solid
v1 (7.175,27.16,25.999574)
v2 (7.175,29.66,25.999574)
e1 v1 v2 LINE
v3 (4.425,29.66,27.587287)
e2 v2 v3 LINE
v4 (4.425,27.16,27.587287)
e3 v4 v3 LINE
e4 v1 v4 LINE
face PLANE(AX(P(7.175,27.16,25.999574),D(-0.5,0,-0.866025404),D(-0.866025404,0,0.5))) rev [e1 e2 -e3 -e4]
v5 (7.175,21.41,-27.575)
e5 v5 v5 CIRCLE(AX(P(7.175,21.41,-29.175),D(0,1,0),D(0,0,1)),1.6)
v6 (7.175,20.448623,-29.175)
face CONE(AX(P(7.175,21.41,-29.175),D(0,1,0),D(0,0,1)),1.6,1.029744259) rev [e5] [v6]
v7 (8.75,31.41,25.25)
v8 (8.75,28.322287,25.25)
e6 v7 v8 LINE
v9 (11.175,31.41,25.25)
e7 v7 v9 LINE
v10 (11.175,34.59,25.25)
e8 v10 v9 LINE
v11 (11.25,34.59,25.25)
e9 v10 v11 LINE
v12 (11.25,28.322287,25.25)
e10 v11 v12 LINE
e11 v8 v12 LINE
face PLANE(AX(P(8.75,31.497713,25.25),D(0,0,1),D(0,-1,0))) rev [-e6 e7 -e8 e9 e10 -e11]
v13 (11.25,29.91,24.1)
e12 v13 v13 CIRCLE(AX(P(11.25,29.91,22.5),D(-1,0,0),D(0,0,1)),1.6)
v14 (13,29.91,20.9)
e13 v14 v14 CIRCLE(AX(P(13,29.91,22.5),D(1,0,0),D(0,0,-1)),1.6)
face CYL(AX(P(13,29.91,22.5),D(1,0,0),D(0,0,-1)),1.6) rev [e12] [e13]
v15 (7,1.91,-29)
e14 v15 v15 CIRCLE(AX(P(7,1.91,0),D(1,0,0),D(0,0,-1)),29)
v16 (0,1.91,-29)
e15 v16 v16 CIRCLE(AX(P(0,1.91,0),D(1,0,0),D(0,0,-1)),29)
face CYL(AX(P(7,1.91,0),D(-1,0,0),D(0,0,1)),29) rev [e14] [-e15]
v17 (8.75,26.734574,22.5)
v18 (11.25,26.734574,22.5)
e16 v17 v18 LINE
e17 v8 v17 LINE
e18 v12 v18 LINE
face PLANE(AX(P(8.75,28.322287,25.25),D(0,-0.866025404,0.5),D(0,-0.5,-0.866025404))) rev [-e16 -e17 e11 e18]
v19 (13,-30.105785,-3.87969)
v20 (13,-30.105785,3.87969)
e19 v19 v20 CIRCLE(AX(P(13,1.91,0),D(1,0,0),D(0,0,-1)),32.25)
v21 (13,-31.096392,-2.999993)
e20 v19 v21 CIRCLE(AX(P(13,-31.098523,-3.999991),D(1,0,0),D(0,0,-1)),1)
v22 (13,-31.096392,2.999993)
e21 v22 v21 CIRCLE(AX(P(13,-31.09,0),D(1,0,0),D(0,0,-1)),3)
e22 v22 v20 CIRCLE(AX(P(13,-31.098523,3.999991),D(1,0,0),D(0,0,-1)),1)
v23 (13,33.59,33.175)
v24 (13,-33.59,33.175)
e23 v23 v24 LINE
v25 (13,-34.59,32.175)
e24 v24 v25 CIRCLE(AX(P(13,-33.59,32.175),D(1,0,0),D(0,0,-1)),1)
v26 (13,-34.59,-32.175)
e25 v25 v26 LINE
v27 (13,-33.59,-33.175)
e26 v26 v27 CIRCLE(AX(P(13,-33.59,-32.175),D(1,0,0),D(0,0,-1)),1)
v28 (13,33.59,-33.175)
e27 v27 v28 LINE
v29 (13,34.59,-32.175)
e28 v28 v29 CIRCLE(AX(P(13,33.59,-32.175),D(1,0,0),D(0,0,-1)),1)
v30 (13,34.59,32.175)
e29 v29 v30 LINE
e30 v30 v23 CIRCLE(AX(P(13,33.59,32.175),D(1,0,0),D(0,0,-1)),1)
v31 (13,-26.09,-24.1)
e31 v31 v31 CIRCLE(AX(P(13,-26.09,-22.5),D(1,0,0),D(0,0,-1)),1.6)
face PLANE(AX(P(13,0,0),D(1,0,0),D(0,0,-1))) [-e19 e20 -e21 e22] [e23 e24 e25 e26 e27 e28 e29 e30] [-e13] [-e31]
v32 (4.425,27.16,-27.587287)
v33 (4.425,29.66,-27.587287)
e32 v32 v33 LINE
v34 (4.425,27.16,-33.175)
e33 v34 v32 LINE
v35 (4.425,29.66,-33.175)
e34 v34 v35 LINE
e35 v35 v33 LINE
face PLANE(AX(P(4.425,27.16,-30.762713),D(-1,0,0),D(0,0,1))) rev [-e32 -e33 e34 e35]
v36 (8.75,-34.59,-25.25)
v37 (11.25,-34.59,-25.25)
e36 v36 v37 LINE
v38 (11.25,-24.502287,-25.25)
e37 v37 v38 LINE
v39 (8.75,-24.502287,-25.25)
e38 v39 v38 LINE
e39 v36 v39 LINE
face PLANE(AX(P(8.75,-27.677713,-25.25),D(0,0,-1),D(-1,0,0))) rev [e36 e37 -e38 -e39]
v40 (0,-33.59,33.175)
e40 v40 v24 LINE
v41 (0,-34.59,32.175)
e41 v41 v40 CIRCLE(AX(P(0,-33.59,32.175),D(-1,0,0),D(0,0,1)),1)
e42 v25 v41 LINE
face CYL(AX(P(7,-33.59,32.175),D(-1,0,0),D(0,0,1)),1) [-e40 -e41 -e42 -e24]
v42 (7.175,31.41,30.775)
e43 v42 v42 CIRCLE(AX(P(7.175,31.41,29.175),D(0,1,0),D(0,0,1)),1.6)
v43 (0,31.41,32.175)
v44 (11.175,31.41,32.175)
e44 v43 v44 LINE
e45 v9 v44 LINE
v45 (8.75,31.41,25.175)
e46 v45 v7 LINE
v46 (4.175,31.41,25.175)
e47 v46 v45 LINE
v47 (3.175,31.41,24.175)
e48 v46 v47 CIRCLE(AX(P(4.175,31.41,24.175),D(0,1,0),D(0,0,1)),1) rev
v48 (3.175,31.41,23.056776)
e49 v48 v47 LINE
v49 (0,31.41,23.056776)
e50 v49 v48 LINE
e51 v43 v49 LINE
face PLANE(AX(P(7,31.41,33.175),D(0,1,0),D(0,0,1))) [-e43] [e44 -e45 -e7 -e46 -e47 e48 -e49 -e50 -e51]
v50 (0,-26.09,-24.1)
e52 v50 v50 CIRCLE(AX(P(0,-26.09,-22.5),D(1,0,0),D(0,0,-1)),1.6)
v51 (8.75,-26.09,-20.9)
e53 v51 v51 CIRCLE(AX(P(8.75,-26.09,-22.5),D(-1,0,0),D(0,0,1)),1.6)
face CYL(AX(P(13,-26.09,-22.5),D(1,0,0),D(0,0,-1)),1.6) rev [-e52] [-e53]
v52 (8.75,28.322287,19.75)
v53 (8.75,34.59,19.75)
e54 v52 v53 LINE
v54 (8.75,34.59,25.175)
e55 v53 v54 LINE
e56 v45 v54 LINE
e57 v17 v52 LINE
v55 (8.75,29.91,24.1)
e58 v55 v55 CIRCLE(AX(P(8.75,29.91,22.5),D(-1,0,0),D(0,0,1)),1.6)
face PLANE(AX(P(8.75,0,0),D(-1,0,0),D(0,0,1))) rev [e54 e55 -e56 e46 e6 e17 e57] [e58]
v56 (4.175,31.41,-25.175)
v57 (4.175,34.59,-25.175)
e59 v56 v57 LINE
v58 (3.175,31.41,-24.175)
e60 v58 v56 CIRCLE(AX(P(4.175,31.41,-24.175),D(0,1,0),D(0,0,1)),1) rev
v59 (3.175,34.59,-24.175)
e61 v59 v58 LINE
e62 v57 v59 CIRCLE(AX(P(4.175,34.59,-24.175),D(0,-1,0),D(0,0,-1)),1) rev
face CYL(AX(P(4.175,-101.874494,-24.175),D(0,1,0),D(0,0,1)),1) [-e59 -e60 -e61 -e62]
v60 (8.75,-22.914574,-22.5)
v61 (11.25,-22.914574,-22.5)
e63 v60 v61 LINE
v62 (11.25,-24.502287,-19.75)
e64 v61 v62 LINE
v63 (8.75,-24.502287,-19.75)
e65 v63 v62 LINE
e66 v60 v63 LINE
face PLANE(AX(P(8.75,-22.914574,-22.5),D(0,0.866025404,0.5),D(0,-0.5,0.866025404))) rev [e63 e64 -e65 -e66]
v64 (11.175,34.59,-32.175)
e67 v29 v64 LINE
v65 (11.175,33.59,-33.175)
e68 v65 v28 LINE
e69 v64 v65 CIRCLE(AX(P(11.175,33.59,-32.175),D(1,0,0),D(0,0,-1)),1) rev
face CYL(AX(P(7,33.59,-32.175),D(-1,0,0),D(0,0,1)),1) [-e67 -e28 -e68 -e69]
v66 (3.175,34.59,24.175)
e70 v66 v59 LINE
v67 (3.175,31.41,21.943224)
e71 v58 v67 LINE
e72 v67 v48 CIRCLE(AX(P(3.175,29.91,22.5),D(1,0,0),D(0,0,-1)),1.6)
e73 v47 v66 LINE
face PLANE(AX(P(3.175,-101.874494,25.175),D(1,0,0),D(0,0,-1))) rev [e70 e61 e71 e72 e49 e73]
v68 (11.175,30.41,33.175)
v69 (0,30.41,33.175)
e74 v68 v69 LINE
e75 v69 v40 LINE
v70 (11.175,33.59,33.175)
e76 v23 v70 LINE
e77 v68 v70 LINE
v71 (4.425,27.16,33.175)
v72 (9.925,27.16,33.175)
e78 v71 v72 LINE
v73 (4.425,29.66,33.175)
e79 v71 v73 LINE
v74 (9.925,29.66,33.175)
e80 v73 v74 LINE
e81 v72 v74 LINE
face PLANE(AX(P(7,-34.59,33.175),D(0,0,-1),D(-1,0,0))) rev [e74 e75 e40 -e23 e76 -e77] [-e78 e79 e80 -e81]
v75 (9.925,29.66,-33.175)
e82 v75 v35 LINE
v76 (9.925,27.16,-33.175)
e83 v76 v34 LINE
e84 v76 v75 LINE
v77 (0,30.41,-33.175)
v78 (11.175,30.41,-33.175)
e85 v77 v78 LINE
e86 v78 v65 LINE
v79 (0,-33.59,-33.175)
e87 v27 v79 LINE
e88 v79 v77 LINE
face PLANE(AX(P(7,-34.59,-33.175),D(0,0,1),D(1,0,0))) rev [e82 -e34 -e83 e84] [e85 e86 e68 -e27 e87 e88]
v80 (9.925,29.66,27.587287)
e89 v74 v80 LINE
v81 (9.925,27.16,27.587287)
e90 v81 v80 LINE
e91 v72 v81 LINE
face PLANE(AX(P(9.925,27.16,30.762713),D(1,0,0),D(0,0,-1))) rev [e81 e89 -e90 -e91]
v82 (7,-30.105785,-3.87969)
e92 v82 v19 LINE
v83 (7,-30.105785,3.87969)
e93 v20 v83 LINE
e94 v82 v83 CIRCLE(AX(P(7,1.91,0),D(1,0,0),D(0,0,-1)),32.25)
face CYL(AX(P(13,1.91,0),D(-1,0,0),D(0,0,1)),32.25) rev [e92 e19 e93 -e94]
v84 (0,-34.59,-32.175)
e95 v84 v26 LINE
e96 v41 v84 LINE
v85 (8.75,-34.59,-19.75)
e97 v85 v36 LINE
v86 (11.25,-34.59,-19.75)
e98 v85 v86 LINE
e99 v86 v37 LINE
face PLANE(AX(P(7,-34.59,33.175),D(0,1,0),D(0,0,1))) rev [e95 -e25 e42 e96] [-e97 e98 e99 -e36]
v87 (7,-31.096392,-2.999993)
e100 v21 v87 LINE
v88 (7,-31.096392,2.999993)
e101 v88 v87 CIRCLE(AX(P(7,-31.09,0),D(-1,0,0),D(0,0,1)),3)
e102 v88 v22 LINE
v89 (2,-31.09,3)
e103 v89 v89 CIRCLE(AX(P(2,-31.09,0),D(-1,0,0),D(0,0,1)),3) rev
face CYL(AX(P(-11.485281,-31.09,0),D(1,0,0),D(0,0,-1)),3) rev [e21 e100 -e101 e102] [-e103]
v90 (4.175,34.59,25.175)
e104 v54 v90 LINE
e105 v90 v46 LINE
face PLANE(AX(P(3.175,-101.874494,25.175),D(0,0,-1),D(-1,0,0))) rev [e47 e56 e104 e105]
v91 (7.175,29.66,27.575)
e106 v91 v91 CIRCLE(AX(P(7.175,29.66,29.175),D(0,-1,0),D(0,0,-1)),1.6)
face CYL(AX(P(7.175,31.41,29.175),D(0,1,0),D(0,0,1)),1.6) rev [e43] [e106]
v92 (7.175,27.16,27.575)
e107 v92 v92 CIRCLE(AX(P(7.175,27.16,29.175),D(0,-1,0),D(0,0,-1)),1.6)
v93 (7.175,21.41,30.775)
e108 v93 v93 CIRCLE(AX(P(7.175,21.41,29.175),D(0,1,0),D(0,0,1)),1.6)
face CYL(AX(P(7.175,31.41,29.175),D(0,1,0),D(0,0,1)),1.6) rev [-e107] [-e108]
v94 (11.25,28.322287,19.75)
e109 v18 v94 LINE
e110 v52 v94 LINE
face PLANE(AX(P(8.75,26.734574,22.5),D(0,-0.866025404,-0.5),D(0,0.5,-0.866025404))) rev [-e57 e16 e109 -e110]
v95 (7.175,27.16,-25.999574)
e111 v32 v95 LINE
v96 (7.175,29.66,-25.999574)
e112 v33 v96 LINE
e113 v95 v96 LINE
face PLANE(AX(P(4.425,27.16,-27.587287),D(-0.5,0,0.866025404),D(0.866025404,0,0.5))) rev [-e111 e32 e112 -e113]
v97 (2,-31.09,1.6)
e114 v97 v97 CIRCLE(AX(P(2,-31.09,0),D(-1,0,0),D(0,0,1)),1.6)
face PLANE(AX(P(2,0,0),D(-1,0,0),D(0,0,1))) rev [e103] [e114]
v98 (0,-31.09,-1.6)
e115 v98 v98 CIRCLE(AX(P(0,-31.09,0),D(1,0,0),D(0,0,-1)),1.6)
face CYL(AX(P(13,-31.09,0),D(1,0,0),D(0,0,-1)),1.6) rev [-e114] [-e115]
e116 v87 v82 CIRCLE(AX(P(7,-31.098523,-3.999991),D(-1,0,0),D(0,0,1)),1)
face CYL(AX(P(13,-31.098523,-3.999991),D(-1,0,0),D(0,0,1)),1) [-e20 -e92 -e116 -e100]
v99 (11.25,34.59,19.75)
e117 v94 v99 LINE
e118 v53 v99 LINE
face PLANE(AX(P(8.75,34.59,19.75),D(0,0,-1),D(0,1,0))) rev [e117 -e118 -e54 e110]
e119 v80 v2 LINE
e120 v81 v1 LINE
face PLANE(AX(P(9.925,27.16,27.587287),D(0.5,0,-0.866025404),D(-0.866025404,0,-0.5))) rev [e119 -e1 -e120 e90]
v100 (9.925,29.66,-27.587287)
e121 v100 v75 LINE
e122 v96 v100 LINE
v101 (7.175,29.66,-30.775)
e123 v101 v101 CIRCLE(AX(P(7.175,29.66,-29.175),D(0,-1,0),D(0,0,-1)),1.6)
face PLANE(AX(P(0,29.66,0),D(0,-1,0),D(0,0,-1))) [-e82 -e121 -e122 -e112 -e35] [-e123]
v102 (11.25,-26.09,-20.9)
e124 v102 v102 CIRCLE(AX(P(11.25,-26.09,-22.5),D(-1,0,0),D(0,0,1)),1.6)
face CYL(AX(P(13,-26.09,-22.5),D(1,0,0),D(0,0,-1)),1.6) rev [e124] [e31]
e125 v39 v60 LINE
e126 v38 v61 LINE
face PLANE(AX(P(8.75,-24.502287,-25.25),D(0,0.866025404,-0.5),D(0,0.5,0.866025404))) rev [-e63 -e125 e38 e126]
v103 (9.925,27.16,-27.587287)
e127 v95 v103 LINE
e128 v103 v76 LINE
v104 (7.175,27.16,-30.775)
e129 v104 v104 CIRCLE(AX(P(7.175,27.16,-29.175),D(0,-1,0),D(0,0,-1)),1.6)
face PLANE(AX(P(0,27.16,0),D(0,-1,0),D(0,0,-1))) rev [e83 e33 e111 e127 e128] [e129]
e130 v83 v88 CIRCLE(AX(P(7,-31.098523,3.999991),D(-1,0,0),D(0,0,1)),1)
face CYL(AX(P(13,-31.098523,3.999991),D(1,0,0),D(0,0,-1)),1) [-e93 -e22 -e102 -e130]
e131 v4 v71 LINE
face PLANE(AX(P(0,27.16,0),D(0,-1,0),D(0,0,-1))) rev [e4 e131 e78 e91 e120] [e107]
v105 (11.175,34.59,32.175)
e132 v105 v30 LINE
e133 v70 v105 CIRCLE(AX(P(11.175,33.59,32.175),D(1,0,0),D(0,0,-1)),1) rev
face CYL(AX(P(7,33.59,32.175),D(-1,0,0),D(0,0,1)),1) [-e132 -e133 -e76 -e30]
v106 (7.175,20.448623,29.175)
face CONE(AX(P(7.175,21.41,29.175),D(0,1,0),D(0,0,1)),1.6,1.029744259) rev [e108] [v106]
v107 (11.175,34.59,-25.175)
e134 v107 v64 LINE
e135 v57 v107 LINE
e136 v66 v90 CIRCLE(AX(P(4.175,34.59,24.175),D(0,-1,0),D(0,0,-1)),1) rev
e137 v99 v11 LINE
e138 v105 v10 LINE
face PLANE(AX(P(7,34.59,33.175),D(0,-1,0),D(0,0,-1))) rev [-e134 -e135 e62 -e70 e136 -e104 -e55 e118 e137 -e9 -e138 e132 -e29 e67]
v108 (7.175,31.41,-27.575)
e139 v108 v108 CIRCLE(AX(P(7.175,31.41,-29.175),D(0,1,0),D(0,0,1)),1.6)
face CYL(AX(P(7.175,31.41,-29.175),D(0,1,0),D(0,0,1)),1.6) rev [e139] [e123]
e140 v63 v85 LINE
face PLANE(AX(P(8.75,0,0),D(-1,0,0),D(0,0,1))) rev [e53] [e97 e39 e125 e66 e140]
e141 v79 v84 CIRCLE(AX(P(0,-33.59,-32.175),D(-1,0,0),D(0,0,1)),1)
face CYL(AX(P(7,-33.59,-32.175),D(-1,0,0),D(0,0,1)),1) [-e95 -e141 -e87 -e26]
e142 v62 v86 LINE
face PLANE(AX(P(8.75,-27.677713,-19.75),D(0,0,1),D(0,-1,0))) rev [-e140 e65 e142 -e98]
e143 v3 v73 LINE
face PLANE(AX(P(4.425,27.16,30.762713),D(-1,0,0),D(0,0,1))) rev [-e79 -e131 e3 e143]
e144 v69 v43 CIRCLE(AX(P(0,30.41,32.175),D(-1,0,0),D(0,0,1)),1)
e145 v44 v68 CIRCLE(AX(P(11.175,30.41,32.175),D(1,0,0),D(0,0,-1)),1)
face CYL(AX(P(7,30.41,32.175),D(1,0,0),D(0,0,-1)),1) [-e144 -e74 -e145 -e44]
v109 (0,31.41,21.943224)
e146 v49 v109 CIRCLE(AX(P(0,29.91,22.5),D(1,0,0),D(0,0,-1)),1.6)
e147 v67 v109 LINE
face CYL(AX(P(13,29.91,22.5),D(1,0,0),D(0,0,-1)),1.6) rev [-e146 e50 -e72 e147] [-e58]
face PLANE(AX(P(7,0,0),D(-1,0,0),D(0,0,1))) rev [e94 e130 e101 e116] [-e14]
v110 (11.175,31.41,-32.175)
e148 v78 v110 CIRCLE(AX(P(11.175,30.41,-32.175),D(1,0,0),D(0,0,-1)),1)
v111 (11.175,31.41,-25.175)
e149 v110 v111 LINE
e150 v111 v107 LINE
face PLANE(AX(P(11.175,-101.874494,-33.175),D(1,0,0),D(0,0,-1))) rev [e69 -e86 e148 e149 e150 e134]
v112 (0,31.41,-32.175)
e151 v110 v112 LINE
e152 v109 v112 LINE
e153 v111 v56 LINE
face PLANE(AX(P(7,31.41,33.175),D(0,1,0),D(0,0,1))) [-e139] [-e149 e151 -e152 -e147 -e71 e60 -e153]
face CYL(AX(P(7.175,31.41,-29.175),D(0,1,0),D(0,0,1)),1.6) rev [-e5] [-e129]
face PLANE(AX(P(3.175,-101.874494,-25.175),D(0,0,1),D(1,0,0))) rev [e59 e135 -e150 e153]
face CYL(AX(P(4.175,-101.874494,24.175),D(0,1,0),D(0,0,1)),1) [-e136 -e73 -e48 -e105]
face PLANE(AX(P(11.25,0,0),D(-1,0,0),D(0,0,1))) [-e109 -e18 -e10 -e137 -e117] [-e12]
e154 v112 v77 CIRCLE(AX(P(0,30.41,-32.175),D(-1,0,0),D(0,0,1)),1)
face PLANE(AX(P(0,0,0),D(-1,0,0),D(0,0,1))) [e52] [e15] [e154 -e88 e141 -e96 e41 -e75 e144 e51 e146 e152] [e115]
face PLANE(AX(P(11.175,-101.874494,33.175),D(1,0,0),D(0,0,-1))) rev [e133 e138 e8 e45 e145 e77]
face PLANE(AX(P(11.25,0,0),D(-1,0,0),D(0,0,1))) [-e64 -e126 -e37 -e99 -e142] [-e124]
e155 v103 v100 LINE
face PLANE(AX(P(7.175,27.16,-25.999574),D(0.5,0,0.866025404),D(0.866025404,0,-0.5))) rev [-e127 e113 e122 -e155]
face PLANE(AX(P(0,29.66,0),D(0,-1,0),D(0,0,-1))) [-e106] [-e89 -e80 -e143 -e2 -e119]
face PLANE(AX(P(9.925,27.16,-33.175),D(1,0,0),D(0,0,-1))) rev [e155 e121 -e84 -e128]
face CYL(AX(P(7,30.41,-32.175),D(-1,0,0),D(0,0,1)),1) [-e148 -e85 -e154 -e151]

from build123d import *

# Parameters (mm, degrees)
SKETCH1_W                = 66.35
SKETCH1_H                = 69.18
SKETCH1_R                = 29
BOSS_EXTRUDE1_DEPTH      = 7
SKETCH3_W                = 66.35
SKETCH3_H                = 69.18
SKETCH3_R                = 32.25
BOSS_EXTRUDE2_DEPTH      = 6
CUT_EXTRUDE1_DEPTH       = 3.18
CUT_EXTRUDE5_DEPTH       = 1.25
M3_CLEARANCE_HOLE3_D     = 3.2
M3_CLEARANCE_HOLE3_DEPTH = 10
M3_CLEARANCE_HOLE3_TIP   = 0.96137699
SKETCH14_R               = 3
CUT_EXTRUDE3_DEPTH       = 11
CUT_EXTRUDE4_DEPTH       = 1.25
M3_CLEARANCE_HOLE2_D     = 3.2
FILLET1_R                = 1


with BuildPart() as part:
    # Sketch1 → Boss-Extrude1 (new body)
    with BuildSketch(Plane(origin=(0, 0, 0), x_dir=(0, 0, -1), z_dir=(1, 0, 0))):
        Rectangle(SKETCH1_W, SKETCH1_H)
        with Locations((0, 1.91)):
            Circle(SKETCH1_R, mode=Mode.SUBTRACT)
    extrude(amount=BOSS_EXTRUDE1_DEPTH)

    # Sketch3 → Boss-Extrude2 (add)
    with BuildSketch(Plane(origin=(7, 0, 0), x_dir=(0, 0, -1), z_dir=(1, 0, 0))):
        Rectangle(SKETCH3_W, SKETCH3_H)
        with Locations((0, 1.91)):
            Circle(SKETCH3_R, mode=Mode.SUBTRACT)
    extrude(amount=BOSS_EXTRUDE2_DEPTH)

    # Sketch5 → Cut-Extrude1 (cut)
    with BuildSketch(Plane(origin=(0, 34.59, 0), x_dir=(1, 0, 0), z_dir=(0, 1, 0))):
        Polygon((3.175, 33.175), (11.175, 33.175), (11.175, 25.175), (3.175, 25.175), (3.175, -25.175), (11.175, -25.175), (11.175, -33.175), (3.175, -33.175), (0, -33.175), (0, 33.175), align=None)
    extrude(amount=-CUT_EXTRUDE1_DEPTH, mode=Mode.SUBTRACT)

    # Sketch8 → Cut-Extrude5 (cut, symmetric)
    with BuildSketch(Plane(origin=(0, 28.41, 0), x_dir=(1, 0, 0), z_dir=(0, 1, 0))):
        Polygon((4.425, -30.76271324), (4.425, -33.175), (9.925, -33.175), (9.925, -30.76271324), (9.925, -27.58728676), (7.175, -25.999573519), (4.425, -27.58728676), align=None)
        Polygon((4.425, 30.76271324), (4.425, 27.58728676), (7.175, 25.999573519), (9.925, 27.58728676), (9.925, 30.76271324), (9.925, 33.175), (4.425, 33.175), align=None)
    extrude(amount=CUT_EXTRUDE5_DEPTH, both=True, mode=Mode.SUBTRACT)

    # M3 Clearance Hole3
    with Locations(Plane(origin=(0, 31.41, 0), x_dir=(1, 0, 0), z_dir=(0, 1, 0))):
        with Locations((7.175, 29.175), (7.175, -29.175)):
            Hole(M3_CLEARANCE_HOLE3_D / 2, depth=M3_CLEARANCE_HOLE3_DEPTH)
            with Locations((0, 0, -(M3_CLEARANCE_HOLE3_DEPTH + M3_CLEARANCE_HOLE3_TIP / 2))):  # 118° drill point
                Cone(0, M3_CLEARANCE_HOLE3_D / 2, M3_CLEARANCE_HOLE3_TIP, mode=Mode.SUBTRACT)

    # Sketch14 → Cut-Extrude3 (cut)
    with BuildSketch(Plane(origin=(13, 0, 0), x_dir=(0, 0, -1), z_dir=(1, 0, 0))):
        with Locations(Location((0, -31.09, 0), (0, 0, 17.014495586))):
            Circle(SKETCH14_R)
    extrude(amount=-CUT_EXTRUDE3_DEPTH, mode=Mode.SUBTRACT)

    # Sketch15 → Cut-Extrude4 (cut, symmetric)
    with BuildSketch(Plane(origin=(10, 0, 0), x_dir=(0, 0, -1), z_dir=(1, 0, 0))):
        Polygon((19.75, -27.67771324), (19.75, -34.59), (25.25, -34.59), (25.25, -27.67771324), (25.25, -24.50228676), (22.5, -22.914573519), (19.75, -24.50228676), align=None)
        Polygon((-25.25, 31.49771324), (-25.25, 28.32228676), (-22.5, 26.734573519), (-19.75, 28.32228676), (-19.75, 31.49771324), (-19.75, 34.59), (-25.25, 34.59), align=None)
    extrude(amount=CUT_EXTRUDE4_DEPTH, both=True, mode=Mode.SUBTRACT)

    # M3 Clearance Hole2 (through all)
    with Locations(Plane(origin=(13, 0, 0), x_dir=(0, 0, -1), z_dir=(1, 0, 0))):
        with Locations((0, -31.09), (-22.5, 29.91), (22.5, -26.09)):
            Hole(M3_CLEARANCE_HOLE2_D / 2)

    # Fillet1
    # the kernel refuses this fillet: 1 mm, written as the material it takes off along each edge
    with BuildSketch(Plane(origin=(15.541447309, -30.212159091, -2.86869227), x_dir=(0, 0.10463908586340893, -0.9945102622445231), z_dir=(-1, 0, 0))) as fillet1_piece_1:
        with BuildLine():
            CenterArc((1.032339837, 0.999875789), FILLET1_R, 186.128452326, 82.968476456)
            ThreePointArc((0.038054785, 0.893117956), (0.052480052, 0.445133596), (0, 0))
            ThreePointArc((0, 0), (0.508289462, 0.004005802), (1.016578924, 0))
        make_face()
    extrude(amount=8.541447309, mode=Mode.SUBTRACT)
    with BuildSketch(Plane(origin=(15.541447309, -30.212159091, 2.86869227), x_dir=(0, 0.10463908586340893, 0.9945102622445231), z_dir=(-1, 0, 0))) as fillet1_piece_2:
        with BuildLine():
            CenterArc((1.032339837, -0.999875789), FILLET1_R, 90.903071218, 82.968476456)
            ThreePointArc((0.038054785, -0.893117956), (0.052480052, -0.445133596), (0, 0))
            ThreePointArc((0, 0), (0.508289462, -0.004005802), (1.016578924, 0))
        make_face()
    extrude(amount=8.541447309, mode=Mode.SUBTRACT)
    with BuildSketch(Plane(origin=(3.175, 37.09, -25.175), x_dir=(1, 0, 0), z_dir=(0, -1, 0)), Plane(origin=(3.175, 37.09, 25.175), x_dir=(0, 0, -1), z_dir=(0, -1, 0))) as fillet1_piece_3:
        with BuildLine():
            CenterArc((FILLET1_R, FILLET1_R), FILLET1_R, 180, 90)
            Line((0, FILLET1_R), (0, 0))
            Line((0, 0), (FILLET1_R, 0))
        make_face()
    extrude(amount=5.68, mode=Mode.SUBTRACT)
    with BuildSketch(Plane(origin=(11.175, 31.41, -33.175), x_dir=(0, -1, 0), z_dir=(-1, 0, 0)), Plane(origin=(-2.5, 31.41, 33.175), x_dir=(0, -1, 0), z_dir=(1, 0, 0))) as fillet1_piece_4:
        with BuildLine():
            CenterArc((FILLET1_R, FILLET1_R), FILLET1_R, 180, 90)
            Line((0, FILLET1_R), (0, 0))
            Line((0, 0), (FILLET1_R, 0))
        make_face()
    extrude(amount=13.675, mode=Mode.SUBTRACT)
    with BuildSketch(Plane(origin=(-2.5, -34.59, -33.175), x_dir=(0, 0, 1), z_dir=(1, 0, 0)), Plane(origin=(15.5, -34.59, 33.175), x_dir=(0, 0, -1), z_dir=(-1, 0, 0))) as fillet1_piece_5:
        with BuildLine():
            CenterArc((FILLET1_R, -FILLET1_R), FILLET1_R, 90, 90)
            Line((0, -FILLET1_R), (0, 0))
            Line((0, 0), (FILLET1_R, 0))
        make_face()
    extrude(amount=18, mode=Mode.SUBTRACT)
    with BuildSketch(Plane(origin=(15.5, 34.59, 33.175), x_dir=(0, -1, 0), z_dir=(-1, 0, 0)), Plane(origin=(8.675, 34.59, -33.175), x_dir=(0, -1, 0), z_dir=(1, 0, 0))) as fillet1_piece_6:
        with BuildLine():
            CenterArc((FILLET1_R, -FILLET1_R), FILLET1_R, 90, 90)
            Line((0, -FILLET1_R), (0, 0))
            Line((0, 0), (FILLET1_R, 0))
        make_face()
    extrude(amount=6.825, mode=Mode.SUBTRACT)


solid = part.part
